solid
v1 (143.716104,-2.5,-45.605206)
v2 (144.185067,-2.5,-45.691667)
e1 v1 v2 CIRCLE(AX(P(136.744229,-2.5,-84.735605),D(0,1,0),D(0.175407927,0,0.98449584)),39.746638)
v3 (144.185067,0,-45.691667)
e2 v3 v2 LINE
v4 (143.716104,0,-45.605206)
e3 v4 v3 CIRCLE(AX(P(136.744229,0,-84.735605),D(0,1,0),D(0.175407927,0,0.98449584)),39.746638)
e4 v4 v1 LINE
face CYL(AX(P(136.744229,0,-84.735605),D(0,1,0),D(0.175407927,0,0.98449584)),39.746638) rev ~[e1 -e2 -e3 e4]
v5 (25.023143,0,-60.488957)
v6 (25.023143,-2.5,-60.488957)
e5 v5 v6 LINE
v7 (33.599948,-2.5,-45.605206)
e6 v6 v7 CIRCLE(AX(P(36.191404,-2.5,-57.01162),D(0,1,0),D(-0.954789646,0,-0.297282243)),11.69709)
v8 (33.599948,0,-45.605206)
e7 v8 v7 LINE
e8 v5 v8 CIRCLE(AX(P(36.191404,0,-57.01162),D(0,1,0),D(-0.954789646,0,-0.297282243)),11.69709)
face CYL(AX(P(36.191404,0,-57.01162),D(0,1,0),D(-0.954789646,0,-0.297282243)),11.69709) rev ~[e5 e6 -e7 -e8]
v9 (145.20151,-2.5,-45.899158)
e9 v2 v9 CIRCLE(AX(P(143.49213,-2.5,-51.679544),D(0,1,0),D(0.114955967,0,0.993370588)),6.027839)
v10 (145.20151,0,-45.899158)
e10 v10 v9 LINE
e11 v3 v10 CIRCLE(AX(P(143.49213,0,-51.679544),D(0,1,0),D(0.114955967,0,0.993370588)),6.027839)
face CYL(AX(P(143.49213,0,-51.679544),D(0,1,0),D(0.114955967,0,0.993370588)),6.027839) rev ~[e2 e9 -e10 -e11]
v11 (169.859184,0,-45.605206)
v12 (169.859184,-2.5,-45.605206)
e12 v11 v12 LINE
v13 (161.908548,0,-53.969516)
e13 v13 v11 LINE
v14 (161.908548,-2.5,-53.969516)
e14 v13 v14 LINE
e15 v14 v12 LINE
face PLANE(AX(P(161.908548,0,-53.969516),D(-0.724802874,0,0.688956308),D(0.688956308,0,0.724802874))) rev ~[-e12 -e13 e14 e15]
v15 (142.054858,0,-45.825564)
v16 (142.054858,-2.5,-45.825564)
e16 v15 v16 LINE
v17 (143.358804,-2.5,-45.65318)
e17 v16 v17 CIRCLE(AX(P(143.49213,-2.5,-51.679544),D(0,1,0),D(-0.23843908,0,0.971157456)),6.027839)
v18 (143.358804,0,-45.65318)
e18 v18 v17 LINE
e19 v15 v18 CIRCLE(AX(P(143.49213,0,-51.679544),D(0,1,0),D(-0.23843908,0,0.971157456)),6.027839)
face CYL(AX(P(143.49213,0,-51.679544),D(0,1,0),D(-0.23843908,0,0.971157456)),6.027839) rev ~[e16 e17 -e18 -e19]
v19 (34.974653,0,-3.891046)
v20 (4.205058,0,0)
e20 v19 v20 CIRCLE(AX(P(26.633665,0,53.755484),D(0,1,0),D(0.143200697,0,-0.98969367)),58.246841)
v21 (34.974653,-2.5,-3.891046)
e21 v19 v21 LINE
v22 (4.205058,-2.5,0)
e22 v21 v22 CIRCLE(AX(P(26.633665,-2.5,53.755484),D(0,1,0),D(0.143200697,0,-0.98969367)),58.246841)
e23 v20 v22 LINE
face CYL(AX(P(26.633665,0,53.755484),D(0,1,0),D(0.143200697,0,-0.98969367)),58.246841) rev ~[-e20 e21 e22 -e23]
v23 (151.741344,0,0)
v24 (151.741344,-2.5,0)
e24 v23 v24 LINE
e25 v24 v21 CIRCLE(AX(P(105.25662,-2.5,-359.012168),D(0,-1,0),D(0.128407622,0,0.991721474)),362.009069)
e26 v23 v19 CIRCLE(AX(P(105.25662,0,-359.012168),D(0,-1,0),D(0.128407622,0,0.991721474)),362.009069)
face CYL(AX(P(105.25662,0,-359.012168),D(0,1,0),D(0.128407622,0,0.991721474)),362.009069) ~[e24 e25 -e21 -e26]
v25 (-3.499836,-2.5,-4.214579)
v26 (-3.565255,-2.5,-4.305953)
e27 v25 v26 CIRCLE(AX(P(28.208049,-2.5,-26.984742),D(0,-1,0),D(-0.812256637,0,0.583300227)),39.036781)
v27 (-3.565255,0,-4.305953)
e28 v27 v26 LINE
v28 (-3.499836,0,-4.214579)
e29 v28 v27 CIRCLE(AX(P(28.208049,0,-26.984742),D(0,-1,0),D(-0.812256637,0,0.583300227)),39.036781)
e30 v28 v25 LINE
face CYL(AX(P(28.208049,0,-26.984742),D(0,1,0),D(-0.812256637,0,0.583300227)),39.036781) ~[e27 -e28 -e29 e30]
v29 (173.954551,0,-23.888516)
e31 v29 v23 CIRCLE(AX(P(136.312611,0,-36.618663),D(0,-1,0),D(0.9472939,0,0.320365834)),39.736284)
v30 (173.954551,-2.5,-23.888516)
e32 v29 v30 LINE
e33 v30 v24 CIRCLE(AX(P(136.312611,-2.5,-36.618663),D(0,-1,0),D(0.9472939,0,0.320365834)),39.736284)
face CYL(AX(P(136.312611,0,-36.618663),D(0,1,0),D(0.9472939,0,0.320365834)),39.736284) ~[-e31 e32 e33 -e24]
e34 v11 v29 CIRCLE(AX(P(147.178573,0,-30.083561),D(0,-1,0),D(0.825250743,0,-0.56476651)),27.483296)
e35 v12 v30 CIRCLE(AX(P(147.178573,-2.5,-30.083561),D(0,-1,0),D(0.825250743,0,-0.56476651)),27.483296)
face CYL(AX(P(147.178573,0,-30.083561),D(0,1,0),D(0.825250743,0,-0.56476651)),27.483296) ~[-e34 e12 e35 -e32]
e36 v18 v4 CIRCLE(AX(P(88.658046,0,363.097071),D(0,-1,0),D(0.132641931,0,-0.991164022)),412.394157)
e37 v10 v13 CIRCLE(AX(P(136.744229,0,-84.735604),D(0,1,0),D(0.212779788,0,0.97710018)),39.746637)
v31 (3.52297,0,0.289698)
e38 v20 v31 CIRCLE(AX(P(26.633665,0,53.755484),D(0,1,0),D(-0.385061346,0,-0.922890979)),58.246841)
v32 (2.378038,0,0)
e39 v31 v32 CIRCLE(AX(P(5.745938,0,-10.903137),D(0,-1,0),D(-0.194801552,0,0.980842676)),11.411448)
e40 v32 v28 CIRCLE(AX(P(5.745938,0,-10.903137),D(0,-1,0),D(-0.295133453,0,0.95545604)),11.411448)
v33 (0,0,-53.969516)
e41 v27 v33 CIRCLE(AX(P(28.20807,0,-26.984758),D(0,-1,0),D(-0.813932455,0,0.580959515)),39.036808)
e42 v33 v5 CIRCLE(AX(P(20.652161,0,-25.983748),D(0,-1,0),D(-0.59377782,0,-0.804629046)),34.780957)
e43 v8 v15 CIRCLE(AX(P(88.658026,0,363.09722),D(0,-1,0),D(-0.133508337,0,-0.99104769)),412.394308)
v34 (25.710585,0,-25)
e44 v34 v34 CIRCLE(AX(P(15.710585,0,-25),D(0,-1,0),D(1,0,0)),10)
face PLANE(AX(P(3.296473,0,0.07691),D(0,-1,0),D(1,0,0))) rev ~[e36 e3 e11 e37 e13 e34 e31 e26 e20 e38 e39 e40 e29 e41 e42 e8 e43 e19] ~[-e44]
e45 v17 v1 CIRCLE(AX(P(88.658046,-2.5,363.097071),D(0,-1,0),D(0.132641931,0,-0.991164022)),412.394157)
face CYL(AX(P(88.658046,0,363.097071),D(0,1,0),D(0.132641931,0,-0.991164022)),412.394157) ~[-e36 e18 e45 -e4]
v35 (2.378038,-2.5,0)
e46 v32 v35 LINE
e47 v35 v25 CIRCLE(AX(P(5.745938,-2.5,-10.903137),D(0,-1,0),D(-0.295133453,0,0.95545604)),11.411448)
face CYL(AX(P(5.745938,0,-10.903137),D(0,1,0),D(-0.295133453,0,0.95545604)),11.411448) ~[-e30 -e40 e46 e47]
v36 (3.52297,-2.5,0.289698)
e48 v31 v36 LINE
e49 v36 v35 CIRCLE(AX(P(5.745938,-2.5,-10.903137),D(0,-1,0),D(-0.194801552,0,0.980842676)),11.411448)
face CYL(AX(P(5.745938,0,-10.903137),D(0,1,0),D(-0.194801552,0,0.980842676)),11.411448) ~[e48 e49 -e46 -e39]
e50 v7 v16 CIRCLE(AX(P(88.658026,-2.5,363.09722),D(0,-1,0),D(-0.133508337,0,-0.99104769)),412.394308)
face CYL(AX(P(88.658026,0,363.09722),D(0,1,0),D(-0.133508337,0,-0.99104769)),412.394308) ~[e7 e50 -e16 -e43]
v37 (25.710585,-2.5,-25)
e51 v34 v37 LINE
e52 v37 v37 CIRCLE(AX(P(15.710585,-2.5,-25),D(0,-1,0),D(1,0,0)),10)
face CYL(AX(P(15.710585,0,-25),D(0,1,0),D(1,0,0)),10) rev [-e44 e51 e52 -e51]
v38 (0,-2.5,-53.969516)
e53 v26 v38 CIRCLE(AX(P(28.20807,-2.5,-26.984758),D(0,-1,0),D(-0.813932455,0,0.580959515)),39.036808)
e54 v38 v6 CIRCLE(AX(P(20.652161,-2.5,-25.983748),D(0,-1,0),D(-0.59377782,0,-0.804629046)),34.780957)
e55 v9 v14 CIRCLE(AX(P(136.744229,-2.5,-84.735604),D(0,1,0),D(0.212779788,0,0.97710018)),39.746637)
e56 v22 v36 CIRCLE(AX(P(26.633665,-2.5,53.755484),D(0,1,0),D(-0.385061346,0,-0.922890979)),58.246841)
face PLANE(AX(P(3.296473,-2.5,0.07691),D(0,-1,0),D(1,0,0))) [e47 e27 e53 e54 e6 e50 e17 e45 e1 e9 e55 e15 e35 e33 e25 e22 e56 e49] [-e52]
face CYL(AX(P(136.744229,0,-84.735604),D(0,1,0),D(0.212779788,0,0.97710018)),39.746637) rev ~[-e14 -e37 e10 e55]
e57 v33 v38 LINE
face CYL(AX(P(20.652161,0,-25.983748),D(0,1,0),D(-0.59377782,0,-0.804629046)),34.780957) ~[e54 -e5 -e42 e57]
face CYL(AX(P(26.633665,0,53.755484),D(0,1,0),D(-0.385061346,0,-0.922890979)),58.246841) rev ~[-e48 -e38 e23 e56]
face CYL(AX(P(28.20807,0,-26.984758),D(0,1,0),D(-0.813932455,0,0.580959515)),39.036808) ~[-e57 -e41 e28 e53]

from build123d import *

# Parameters (mm, degrees)
F0_R     = 10
F1_DEPTH = 2.5


# Not quite as in the source:
# - a feature names something its author has since deleted; it is built from what else it names


with BuildPart() as f1:
    # F0 (on Front) → F1 (new body)
    with BuildSketch(Plane.XZ):
        with BuildLine():
            ThreePointArc((3.5229699651, 0.2896982716), (2.9467535756, 0.1596707418), (2.3780377062, 0))
            Line((2.3780377062, 0), (4.205058077, 0))
            ThreePointArc((4.205058077, 0), (3.8635532968, 0.1437643709), (3.5229699651, 0.2896982716))
        make_face()
        with BuildLine():
            Line((4.205058077, 0), (2.3780377062, 0))
            ThreePointArc((2.3780377062, 0), (-0.903638288, -1.6292874632), (-3.4998361796, -4.2145788348))
            ThreePointArc((-3.4998361796, -4.2145788348), (-3.5325783371, -4.260242238), (-3.5652547335, -4.3059527224))
            ThreePointArc((-3.5652547335, -4.3059527224), (-10.7285361122, -29.7799444124), (0, -53.9695158351))
            ThreePointArc((0, -53.9695158351), (11.8831829855, -59.6411390335), (25.0231431088, -60.4889571322))
            ThreePointArc((25.0231431088, -60.4889571322), (26.0566140951, -51.1714178585), (33.5999478712, -45.6052058665))
            ThreePointArc((33.5999478712, -45.6052058665), (87.8201274571, -49.2962363), (142.0548581476, -45.8255638994))
            ThreePointArc((142.0548581476, -45.8255638994), (142.7021149729, -45.7037001136), (143.3588035872, -45.6531803752))
            ThreePointArc((143.3588035872, -45.6531803752), (143.5374590966, -45.629232164), (143.7161041215, -45.6052058665))
            ThreePointArc((143.7161041215, -45.6052058665), (143.95071498, -45.6477329831), (144.1850665045, -45.6916667233))
            ThreePointArc((144.1850665045, -45.6916667233), (144.6977602251, -45.7735054296), (145.2015099012, -45.899158479))
            ThreePointArc((145.2015099012, -45.899158479), (154.032538738, -48.9458086752), (161.9085475054, -53.9695158351))
            Line((161.9085475054, -53.9695158351), (169.8591839037, -45.6052058665))
            ThreePointArc((169.8591839037, -45.6052058665), (174.1858351689, -35.1766319754), (173.9545511242, -23.8885155575))
            ThreePointArc((173.9545511242, -23.8885155575), (165.4122565919, -9.5597842761), (151.7413436521, 0))
            ThreePointArc((151.7413436521, 0), (93.1999930381, 2.7960741366), (34.9746532738, -3.8910456933))
            ThreePointArc((34.9746532738, -3.8910456933), (19.3261135001, -4.0311421401), (4.205058077, 0))
        make_face()
        with Locations((15.7105848193, -25)):
            Circle(F0_R, mode=Mode.SUBTRACT)
    extrude(amount=F1_DEPTH)


solid = f1.part
